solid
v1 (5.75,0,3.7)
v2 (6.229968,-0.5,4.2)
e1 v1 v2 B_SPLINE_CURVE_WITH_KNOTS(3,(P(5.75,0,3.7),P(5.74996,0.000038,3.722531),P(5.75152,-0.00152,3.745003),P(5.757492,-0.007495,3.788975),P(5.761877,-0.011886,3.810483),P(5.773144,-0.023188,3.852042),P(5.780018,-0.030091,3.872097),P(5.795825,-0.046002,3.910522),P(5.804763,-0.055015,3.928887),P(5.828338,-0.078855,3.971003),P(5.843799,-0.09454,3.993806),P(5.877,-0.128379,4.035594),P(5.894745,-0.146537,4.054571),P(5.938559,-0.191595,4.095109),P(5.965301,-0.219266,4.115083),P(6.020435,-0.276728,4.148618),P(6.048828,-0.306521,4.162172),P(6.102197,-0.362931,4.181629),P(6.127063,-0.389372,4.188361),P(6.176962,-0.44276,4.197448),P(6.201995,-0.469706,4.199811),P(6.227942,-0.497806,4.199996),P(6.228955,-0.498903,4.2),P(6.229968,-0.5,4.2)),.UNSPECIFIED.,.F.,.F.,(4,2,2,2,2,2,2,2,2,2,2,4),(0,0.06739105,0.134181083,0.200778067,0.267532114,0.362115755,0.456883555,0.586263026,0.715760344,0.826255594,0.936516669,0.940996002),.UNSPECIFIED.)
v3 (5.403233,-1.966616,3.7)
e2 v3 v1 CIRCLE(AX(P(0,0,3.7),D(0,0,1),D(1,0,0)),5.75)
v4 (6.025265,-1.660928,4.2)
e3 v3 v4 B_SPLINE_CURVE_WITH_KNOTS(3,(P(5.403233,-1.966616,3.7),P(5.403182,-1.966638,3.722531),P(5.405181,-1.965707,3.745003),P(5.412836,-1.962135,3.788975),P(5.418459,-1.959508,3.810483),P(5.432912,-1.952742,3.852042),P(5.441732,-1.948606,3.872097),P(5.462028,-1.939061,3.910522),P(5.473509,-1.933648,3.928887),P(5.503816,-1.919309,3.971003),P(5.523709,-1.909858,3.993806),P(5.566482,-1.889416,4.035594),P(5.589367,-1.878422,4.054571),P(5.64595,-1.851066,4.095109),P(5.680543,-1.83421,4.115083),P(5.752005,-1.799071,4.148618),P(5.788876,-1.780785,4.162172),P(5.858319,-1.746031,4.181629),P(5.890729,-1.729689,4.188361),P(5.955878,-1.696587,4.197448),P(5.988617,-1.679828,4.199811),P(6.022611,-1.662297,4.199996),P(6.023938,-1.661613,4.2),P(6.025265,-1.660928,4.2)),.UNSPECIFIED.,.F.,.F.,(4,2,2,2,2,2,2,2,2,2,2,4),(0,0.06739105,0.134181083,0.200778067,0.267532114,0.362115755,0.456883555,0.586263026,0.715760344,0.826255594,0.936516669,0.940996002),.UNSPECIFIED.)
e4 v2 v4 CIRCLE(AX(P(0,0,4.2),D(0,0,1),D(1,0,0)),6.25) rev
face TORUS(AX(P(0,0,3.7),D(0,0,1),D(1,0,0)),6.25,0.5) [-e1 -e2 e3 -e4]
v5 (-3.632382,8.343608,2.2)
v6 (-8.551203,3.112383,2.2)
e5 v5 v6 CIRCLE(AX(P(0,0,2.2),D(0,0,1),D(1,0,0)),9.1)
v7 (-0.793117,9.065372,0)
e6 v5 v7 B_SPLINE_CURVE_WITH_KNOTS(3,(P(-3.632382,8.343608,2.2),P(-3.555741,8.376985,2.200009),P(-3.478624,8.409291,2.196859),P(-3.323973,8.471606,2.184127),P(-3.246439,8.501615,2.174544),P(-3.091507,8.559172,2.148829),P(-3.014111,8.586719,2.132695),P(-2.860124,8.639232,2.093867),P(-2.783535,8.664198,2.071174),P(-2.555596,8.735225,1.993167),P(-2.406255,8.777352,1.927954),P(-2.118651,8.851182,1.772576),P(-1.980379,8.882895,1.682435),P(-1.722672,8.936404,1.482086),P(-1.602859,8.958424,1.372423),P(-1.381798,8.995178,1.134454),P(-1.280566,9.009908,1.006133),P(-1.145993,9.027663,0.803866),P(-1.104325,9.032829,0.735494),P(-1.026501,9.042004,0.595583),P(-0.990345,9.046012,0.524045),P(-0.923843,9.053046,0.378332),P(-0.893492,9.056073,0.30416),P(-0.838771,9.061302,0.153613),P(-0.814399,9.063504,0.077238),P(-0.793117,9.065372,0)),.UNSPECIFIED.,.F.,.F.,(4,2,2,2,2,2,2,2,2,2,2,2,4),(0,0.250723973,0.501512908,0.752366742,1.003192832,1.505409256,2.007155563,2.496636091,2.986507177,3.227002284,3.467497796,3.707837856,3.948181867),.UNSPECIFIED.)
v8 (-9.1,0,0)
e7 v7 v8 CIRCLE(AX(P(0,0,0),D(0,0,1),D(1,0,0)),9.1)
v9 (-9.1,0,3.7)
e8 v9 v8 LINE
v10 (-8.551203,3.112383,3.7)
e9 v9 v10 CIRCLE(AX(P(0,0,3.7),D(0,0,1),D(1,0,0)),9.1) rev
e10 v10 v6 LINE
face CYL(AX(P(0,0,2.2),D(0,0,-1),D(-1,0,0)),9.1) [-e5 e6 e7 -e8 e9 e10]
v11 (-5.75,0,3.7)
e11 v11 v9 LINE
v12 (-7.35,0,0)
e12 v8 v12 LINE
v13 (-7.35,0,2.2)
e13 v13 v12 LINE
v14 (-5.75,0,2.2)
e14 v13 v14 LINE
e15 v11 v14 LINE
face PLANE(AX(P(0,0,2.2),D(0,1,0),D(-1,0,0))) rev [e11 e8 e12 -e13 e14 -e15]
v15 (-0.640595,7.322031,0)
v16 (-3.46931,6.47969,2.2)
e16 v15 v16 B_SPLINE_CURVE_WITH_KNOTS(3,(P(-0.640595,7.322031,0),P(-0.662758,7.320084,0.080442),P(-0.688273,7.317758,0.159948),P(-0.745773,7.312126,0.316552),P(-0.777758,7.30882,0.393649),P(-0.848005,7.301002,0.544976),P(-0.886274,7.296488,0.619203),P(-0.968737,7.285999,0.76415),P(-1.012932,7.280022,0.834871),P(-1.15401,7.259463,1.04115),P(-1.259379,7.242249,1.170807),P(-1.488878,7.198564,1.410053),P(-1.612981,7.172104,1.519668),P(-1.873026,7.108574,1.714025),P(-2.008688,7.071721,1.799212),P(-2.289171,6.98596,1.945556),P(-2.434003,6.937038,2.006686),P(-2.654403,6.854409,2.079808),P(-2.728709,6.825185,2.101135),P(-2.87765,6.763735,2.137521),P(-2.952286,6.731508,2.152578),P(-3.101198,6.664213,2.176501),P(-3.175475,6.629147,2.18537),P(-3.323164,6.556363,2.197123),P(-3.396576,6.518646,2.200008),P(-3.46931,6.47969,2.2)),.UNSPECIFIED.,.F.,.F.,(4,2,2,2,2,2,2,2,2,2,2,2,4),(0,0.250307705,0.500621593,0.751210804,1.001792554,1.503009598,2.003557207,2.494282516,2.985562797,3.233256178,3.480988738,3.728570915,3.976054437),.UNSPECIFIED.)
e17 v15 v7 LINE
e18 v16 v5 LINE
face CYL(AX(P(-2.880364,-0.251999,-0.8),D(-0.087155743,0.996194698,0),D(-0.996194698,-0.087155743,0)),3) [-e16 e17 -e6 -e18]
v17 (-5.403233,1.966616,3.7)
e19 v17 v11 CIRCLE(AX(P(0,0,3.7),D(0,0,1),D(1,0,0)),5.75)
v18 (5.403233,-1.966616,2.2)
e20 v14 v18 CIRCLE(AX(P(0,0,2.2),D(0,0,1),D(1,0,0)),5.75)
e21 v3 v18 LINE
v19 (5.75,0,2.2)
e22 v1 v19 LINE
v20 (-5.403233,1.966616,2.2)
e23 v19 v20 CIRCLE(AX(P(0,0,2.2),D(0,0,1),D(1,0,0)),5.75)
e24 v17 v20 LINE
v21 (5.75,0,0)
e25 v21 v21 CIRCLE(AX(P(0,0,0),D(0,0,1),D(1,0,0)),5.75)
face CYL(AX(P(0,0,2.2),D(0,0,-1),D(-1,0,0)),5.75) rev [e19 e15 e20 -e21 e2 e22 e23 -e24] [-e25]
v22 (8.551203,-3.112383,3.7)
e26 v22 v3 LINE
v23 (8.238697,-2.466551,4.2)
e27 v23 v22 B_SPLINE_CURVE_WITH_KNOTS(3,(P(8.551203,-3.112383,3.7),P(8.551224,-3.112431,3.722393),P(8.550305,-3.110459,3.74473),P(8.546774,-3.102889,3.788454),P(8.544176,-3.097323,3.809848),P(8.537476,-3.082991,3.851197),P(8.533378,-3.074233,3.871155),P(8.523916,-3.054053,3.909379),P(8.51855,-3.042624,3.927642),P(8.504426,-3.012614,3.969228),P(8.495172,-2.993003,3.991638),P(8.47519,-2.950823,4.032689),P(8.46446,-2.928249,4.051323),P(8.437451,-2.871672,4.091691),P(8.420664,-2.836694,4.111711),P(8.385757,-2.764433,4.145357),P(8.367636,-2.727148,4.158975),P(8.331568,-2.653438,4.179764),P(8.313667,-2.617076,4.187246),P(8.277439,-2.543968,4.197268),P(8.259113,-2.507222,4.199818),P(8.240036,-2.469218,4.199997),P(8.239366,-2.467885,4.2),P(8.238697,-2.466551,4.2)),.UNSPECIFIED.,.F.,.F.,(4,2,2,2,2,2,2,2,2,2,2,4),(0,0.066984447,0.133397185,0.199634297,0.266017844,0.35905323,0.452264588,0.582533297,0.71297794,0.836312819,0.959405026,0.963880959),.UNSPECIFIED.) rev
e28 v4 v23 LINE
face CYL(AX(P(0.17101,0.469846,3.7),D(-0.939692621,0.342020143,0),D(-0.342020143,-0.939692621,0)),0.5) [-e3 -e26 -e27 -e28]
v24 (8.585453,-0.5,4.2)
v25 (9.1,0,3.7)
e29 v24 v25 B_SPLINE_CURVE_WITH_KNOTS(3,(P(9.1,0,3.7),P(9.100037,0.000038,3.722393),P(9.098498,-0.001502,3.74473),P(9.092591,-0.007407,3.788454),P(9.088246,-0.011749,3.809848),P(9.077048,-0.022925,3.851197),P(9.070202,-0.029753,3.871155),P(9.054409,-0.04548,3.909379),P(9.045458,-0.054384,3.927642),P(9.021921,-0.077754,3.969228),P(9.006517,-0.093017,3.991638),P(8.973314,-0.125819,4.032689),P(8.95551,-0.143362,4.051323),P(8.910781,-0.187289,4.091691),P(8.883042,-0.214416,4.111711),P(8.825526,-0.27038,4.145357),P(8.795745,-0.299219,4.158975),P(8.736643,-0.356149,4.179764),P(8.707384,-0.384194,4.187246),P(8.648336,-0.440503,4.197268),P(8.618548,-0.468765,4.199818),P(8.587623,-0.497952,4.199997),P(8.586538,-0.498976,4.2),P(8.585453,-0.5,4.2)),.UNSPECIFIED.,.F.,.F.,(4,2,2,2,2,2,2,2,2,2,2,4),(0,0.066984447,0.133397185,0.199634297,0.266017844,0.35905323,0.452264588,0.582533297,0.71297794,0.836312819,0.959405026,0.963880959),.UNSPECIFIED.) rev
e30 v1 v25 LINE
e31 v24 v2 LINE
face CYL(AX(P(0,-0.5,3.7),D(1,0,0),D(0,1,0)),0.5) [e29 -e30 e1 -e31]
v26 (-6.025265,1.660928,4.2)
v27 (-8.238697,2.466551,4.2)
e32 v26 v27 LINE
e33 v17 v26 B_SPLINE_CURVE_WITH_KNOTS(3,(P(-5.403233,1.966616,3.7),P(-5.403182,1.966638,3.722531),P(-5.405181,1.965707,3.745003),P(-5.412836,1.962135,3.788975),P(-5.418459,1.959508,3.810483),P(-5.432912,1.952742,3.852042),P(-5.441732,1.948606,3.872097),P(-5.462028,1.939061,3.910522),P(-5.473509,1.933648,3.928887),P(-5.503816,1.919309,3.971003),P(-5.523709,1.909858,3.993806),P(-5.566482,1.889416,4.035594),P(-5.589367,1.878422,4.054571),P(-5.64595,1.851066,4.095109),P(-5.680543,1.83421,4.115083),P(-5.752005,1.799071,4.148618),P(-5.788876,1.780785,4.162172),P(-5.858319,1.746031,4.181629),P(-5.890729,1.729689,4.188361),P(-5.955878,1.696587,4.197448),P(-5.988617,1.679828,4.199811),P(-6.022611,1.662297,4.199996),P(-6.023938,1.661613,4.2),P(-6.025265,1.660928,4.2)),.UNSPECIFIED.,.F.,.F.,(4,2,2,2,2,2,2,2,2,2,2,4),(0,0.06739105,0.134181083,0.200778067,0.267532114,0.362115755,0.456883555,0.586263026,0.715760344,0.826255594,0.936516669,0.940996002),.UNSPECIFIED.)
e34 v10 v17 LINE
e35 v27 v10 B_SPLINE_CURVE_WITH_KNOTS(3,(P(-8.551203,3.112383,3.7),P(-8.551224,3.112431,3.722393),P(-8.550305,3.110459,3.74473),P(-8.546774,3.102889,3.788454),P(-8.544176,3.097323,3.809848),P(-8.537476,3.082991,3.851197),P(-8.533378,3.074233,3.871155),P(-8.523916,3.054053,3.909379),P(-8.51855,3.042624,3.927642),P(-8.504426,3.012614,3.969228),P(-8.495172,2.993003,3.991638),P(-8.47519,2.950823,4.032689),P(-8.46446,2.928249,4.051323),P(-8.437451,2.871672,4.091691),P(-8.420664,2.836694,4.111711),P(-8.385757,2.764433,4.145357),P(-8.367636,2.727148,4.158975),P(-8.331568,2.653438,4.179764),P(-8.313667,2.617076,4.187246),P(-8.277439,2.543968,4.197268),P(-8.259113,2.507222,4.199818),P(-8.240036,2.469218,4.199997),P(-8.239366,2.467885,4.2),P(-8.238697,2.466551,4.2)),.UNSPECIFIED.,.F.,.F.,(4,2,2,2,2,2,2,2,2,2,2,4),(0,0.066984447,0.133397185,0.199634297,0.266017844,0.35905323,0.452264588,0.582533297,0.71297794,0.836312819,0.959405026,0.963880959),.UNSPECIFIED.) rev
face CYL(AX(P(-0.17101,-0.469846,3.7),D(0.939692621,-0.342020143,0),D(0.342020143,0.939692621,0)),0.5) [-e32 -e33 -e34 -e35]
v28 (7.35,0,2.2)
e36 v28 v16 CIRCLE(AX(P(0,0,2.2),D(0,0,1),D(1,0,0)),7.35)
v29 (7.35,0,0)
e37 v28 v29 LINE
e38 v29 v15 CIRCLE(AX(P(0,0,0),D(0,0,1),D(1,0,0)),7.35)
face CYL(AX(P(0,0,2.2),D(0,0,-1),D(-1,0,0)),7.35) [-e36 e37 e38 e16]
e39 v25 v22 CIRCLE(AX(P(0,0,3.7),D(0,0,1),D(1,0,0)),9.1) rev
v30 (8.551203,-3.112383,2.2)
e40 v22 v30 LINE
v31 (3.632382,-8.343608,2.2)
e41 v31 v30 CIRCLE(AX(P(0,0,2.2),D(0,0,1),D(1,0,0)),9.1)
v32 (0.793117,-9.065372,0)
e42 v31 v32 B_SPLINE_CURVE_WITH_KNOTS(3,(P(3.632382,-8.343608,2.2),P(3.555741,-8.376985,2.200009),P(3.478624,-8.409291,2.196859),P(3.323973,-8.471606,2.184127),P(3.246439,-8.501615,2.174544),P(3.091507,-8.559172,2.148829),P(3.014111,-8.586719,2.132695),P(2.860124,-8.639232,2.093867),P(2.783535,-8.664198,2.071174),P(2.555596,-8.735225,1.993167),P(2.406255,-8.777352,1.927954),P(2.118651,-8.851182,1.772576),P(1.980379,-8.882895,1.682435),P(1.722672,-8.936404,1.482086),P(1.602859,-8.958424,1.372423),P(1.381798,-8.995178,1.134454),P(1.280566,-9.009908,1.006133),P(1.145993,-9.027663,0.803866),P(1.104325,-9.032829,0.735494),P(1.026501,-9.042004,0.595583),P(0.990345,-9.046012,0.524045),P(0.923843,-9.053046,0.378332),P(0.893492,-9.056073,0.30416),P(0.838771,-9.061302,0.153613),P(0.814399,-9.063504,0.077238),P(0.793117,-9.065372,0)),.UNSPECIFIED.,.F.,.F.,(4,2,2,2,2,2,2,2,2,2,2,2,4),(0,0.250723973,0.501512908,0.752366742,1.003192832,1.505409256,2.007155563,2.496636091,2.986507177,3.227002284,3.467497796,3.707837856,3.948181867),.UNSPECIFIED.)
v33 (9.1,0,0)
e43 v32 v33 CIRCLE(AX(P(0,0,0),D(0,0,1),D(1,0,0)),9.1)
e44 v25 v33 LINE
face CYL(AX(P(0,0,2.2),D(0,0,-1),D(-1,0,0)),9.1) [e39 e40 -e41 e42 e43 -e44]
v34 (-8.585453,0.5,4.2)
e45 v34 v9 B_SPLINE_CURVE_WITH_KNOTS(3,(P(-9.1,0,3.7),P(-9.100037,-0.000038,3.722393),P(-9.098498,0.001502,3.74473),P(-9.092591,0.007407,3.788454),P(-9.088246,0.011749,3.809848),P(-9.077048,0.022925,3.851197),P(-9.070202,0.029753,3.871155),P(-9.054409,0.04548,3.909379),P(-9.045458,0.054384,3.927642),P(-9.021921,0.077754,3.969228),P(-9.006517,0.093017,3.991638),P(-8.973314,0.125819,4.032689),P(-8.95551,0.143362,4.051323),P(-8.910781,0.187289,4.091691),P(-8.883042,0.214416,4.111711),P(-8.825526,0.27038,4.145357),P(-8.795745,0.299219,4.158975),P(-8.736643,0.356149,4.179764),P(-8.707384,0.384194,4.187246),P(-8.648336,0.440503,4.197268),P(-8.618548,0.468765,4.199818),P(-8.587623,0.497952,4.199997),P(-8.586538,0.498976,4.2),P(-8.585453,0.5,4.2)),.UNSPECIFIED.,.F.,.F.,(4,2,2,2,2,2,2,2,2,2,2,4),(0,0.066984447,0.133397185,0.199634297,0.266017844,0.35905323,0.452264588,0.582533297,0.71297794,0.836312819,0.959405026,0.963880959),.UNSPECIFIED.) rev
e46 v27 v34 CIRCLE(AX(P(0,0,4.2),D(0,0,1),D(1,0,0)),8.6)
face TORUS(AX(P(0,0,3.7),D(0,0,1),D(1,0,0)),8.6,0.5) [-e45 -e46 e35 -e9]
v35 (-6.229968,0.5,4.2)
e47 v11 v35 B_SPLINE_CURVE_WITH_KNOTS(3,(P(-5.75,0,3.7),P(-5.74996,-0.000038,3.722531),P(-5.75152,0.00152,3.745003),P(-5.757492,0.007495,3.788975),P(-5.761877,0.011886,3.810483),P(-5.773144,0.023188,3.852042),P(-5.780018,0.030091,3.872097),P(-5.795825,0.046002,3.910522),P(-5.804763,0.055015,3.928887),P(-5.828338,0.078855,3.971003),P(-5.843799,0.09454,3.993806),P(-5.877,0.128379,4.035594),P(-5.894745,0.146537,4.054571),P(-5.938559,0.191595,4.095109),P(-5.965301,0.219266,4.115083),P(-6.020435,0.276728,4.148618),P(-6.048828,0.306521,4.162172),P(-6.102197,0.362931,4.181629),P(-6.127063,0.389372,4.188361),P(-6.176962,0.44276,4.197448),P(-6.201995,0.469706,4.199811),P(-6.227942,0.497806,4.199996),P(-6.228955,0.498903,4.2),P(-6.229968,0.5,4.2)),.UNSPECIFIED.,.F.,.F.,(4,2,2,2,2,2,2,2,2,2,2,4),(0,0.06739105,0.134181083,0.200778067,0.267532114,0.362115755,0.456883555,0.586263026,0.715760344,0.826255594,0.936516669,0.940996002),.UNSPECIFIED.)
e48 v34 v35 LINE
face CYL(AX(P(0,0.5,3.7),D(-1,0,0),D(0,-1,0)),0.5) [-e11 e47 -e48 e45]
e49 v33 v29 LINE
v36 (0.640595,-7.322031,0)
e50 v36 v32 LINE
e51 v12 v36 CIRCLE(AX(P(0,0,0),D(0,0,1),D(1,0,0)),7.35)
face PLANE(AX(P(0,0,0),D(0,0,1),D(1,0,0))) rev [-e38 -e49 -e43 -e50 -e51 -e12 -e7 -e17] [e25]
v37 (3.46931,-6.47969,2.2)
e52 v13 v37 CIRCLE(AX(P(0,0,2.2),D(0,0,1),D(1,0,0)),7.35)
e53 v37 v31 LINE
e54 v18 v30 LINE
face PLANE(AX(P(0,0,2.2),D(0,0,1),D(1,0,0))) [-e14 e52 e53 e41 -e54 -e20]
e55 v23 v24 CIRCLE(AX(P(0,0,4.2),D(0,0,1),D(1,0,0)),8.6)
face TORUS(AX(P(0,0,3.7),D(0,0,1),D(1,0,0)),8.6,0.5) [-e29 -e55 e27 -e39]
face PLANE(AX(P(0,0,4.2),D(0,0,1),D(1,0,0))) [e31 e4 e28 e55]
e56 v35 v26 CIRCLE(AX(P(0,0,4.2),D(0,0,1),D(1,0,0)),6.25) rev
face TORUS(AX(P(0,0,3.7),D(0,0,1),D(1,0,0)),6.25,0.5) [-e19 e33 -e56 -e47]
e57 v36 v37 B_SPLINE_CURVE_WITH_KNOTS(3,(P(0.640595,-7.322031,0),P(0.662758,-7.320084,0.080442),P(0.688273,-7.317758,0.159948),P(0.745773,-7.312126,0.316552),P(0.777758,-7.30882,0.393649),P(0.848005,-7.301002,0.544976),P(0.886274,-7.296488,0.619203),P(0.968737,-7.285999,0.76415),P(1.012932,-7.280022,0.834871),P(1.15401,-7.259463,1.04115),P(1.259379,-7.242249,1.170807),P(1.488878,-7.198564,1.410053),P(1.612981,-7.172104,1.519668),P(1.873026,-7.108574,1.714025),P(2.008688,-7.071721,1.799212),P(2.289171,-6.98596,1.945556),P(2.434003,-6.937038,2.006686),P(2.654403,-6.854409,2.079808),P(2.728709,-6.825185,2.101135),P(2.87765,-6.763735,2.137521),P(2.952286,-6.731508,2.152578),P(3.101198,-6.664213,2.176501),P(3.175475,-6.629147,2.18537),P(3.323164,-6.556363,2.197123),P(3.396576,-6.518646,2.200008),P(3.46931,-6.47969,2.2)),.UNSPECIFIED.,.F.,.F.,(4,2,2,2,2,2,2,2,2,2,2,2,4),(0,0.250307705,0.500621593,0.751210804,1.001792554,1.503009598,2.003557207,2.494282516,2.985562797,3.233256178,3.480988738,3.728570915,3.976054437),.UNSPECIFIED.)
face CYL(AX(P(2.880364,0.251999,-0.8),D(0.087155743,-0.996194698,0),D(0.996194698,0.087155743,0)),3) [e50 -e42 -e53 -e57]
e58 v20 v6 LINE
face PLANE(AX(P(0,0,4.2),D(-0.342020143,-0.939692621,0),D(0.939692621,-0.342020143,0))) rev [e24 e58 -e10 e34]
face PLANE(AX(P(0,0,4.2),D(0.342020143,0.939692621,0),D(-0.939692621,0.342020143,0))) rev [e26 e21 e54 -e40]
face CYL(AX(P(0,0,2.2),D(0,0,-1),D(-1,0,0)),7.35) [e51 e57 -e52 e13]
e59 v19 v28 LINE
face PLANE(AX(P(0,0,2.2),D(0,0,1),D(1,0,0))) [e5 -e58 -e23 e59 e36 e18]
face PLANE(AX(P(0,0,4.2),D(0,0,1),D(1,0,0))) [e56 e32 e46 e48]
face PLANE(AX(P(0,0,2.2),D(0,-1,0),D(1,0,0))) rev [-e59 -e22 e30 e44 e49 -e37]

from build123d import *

# Parameters (mm, degrees)
BOSS_EXTRUDE1_DEPTH = 2.2
BOSS_EXTRUDE2_DEPTH = 2
FILLET1_R           = 0.5
FILLET2_R           = 3


with BuildPart() as part:
    # Sketch3 → Boss-Extrude1 (new body)
    with BuildSketch(Plane.XY):
        with BuildLine():
            ThreePointArc((-7.35, 0), (-7.238336985, 1.276314106), (-6.906740763, 2.513848053))
            Line((-6.906740763, 2.513848053), (-8.551202849, 3.112383304))
            ThreePointArc((-8.551202849, 3.112383304), (-8.961750552, 1.580198417), (-9.1, 0))
            Line((-9.1, 0), (-7.35, 0))
        make_face()
        with BuildLine():
            Line((-8.551202849, 3.112383304), (-6.906740763, 2.513848053))
            ThreePointArc((-6.906740763, 2.513848053), (-4.474396503, 5.831147051), (-0.640594709, 7.322031031))
            Line((-0.640594709, 7.322031031), (-0.793117259, 9.065371753))
            ThreePointArc((-0.793117259, 9.065371753), (-5.539729004, 7.219515397), (-8.551202849, 3.112383304))
        make_face()
        with BuildLine():
            Line((3.550704156, 6.15), (7.101408311, 0))
            Line((7.101408311, 0), (7.35, 0))
            ThreePointArc((7.35, 0), (4.965588026, 5.418988426), (-0.640594709, 7.322031031))
            Line((-0.640594709, 7.322031031), (-0.538055281, 6.15))
            Line((-0.538055281, 6.15), (3.550704156, 6.15))
        make_face()
        with BuildLine():
            ThreePointArc((-0.501145521, 5.728119514), (3.884643694, 4.239344687), (5.75, 0))
            Line((5.75, 0), (7.101408311, 0))
            Line((7.101408311, 0), (3.550704156, 6.15))
            Line((3.550704156, 6.15), (-0.538055281, 6.15))
            Line((-0.538055281, 6.15), (-0.501145521, 5.728119514))
        make_face()
        with BuildLine():
            Line((-5.868261699, 2.135872585), (-5.40323257, 1.966615824))
            ThreePointArc((-5.40323257, 1.966615824), (-3.500378217, 4.561781707), (-0.501145521, 5.728119514))
            Line((-0.501145521, 5.728119514), (-0.538055281, 6.15))
            Line((-0.538055281, 6.15), (-3.550704156, 6.15))
            Line((-3.550704156, 6.15), (-5.868261699, 2.135872585))
        make_face()
        with BuildLine():
            Line((-6.906740763, 2.513848053), (-5.868261699, 2.135872585))
            Line((-5.868261699, 2.135872585), (-3.550704156, 6.15))
            Line((-3.550704156, 6.15), (-0.538055281, 6.15))
            Line((-0.538055281, 6.15), (-0.640594709, 7.322031031))
            ThreePointArc((-0.640594709, 7.322031031), (-4.474396503, 5.831147051), (-6.906740763, 2.513848053))
        make_face()
        with BuildLine():
            Line((-7.101408311, 0), (-5.868261699, 2.135872585))
            Line((-5.868261699, 2.135872585), (-6.906740763, 2.513848053))
            ThreePointArc((-6.906740763, 2.513848053), (-7.238336985, 1.276314106), (-7.35, 0))
            Line((-7.35, 0), (-7.101408311, 0))
        make_face()
        with BuildLine():
            ThreePointArc((-5.75, 0), (-5.66264458, 0.998477022), (-5.40323257, 1.966615824))
            Line((-5.40323257, 1.966615824), (-5.868261699, 2.135872585))
            Line((-5.868261699, 2.135872585), (-7.101408311, 0))
            Line((-7.101408311, 0), (-5.75, 0))
        make_face()
        with BuildLine():
            Line((7.101408311, 0), (5.868261699, -2.135872585))
            Line((5.868261699, -2.135872585), (6.906740763, -2.513848053))
            ThreePointArc((6.906740763, -2.513848053), (7.238336985, -1.276314106), (7.35, 0))
            Line((7.35, 0), (7.101408311, 0))
        make_face()
        with BuildLine():
            ThreePointArc((5.75, 0), (5.66264458, -0.998477022), (5.40323257, -1.966615824))
            Line((5.40323257, -1.966615824), (5.868261699, -2.135872585))
            Line((5.868261699, -2.135872585), (7.101408311, 0))
            Line((7.101408311, 0), (5.75, 0))
        make_face()
        with BuildLine():
            Line((6.906740763, -2.513848053), (5.868261699, -2.135872585))
            Line((5.868261699, -2.135872585), (3.550704156, -6.15))
            Line((3.550704156, -6.15), (0.538055281, -6.15))
            Line((0.538055281, -6.15), (0.640594709, -7.322031031))
            ThreePointArc((0.640594709, -7.322031031), (4.474396503, -5.831147051), (6.906740763, -2.513848053))
        make_face()
        with BuildLine():
            Line((5.868261699, -2.135872585), (5.40323257, -1.966615824))
            ThreePointArc((5.40323257, -1.966615824), (3.500378217, -4.561781707), (0.501145521, -5.728119514))
            Line((0.501145521, -5.728119514), (0.538055281, -6.15))
            Line((0.538055281, -6.15), (3.550704156, -6.15))
            Line((3.550704156, -6.15), (5.868261699, -2.135872585))
        make_face()
        with BuildLine():
            Line((-3.550704156, -6.15), (-7.101408311, 0))
            Line((-7.101408311, 0), (-7.35, 0))
            ThreePointArc((-7.35, 0), (-4.965588026, -5.418988426), (0.640594709, -7.322031031))
            Line((0.640594709, -7.322031031), (0.538055281, -6.15))
            Line((0.538055281, -6.15), (-3.550704156, -6.15))
        make_face()
        with BuildLine():
            ThreePointArc((0.501145521, -5.728119514), (-3.884643694, -4.239344687), (-5.75, 0))
            Line((-5.75, 0), (-7.101408311, 0))
            Line((-7.101408311, 0), (-3.550704156, -6.15))
            Line((-3.550704156, -6.15), (0.538055281, -6.15))
            Line((0.538055281, -6.15), (0.501145521, -5.728119514))
        make_face()
        with BuildLine():
            Line((8.551202849, -3.112383304), (6.906740763, -2.513848053))
            ThreePointArc((6.906740763, -2.513848053), (4.474396503, -5.831147051), (0.640594709, -7.322031031))
            Line((0.640594709, -7.322031031), (0.793117259, -9.065371753))
            ThreePointArc((0.793117259, -9.065371753), (5.539729004, -7.219515397), (8.551202849, -3.112383304))
        make_face()
        with BuildLine():
            ThreePointArc((7.35, 0), (7.238336985, -1.276314106), (6.906740763, -2.513848053))
            Line((6.906740763, -2.513848053), (8.551202849, -3.112383304))
            ThreePointArc((8.551202849, -3.112383304), (8.961750552, -1.580198417), (9.1, 0))
            Line((9.1, 0), (7.35, 0))
        make_face()
    extrude(amount=BOSS_EXTRUDE1_DEPTH)

    # Sketch4 → Boss-Extrude2 (add)
    with BuildSketch(Plane.XY.offset(2.2)):
        with BuildLine():
            Line((-7.35, 0), (-5.75, 0))
            ThreePointArc((-5.75, 0), (-5.66264458, 0.998477022), (-5.40323257, 1.966615824))
            Line((-5.40323257, 1.966615824), (-8.551202849, 3.112383304))
            ThreePointArc((-8.551202849, 3.112383304), (-8.961750552, 1.580198417), (-9.1, 0))
            Line((-9.1, 0), (-7.35, 0))
        make_face()
        with BuildLine():
            Line((7.35, 0), (5.75, 0))
            ThreePointArc((5.75, 0), (5.66264458, -0.998477022), (5.40323257, -1.966615824))
            Line((5.40323257, -1.966615824), (8.551202849, -3.112383304))
            ThreePointArc((8.551202849, -3.112383304), (8.961750552, -1.580198417), (9.1, 0))
            Line((9.1, 0), (7.35, 0))
        make_face()
    extrude(amount=BOSS_EXTRUDE2_DEPTH)

    # Fillet1
    fillet1_edges = [part.edges().sort_by_distance(p)[0] for p in [
        (-5.66264458, 0.998477022, 4.2),
        (-6.977217709, 2.539499564, 4.2),
        (-8.961750552, 1.580198417, 4.2),
        (-7.425, 0, 4.2),
        (5.66264458, -0.998477022, 4.2),
        (6.977217709, -2.539499564, 4.2),
        (8.961750552, -1.580198417, 4.2),
        (7.425, 0, 4.2),
    ]]
    fillet(fillet1_edges, radius=FILLET1_R)

    # Fillet2
    # the kernel refuses this fillet: 3 mm, written as the material it takes off along each edge
    with BuildSketch(Plane(origin=(0.010596731, -0.121121189, 2.2), x_dir=(0.9961946980917455, 0.08715574274765829, 0), z_dir=(0.0871557427476583, -0.9961946980917455, 0))) as fillet2_piece_1_section:
        with BuildLine():
            CenterArc((2.891366459, -3), FILLET2_R, 90, 74.533990047)
            Line((0, -2.2), (0, 0))
            Line((0, 0), (2.891366459, 0))
        make_face()
    fillet2_piece_1 = extrude(amount=16.206832295, mode=Mode.PRIVATE)
    fillet2_piece_1 = fillet2_piece_1 - Plane(origin=(0, 0, 1.592242212), x_dir=(1, 0, 0), z_dir=(0, 0, -1)) * Cylinder(7.35, 44, mode=Mode.PRIVATE)
    add(fillet2_piece_1, mode=Mode.SUBTRACT)
    with BuildSketch(Plane(origin=(-0.010596731, 0.121121189, 2.2), x_dir=(-0.9961946980917455, -0.08715574274765826, 0), z_dir=(-0.08715574274765826, 0.9961946980917455, 0))) as fillet2_piece_2_section:
        with BuildLine():
            CenterArc((2.891366459, -3), FILLET2_R, 90, 74.533990047)
            Line((0, -2.2), (0, 0))
            Line((0, 0), (2.891366459, 0))
        make_face()
    fillet2_piece_2 = extrude(amount=16.206832295, mode=Mode.PRIVATE)
    fillet2_piece_2 = fillet2_piece_2 - Plane(origin=(0, 0, 1.592242212), x_dir=(1, 0, 0), z_dir=(0, 0, -1)) * Cylinder(7.35, 44, mode=Mode.PRIVATE)
    add(fillet2_piece_2, mode=Mode.SUBTRACT)


solid = part.part
